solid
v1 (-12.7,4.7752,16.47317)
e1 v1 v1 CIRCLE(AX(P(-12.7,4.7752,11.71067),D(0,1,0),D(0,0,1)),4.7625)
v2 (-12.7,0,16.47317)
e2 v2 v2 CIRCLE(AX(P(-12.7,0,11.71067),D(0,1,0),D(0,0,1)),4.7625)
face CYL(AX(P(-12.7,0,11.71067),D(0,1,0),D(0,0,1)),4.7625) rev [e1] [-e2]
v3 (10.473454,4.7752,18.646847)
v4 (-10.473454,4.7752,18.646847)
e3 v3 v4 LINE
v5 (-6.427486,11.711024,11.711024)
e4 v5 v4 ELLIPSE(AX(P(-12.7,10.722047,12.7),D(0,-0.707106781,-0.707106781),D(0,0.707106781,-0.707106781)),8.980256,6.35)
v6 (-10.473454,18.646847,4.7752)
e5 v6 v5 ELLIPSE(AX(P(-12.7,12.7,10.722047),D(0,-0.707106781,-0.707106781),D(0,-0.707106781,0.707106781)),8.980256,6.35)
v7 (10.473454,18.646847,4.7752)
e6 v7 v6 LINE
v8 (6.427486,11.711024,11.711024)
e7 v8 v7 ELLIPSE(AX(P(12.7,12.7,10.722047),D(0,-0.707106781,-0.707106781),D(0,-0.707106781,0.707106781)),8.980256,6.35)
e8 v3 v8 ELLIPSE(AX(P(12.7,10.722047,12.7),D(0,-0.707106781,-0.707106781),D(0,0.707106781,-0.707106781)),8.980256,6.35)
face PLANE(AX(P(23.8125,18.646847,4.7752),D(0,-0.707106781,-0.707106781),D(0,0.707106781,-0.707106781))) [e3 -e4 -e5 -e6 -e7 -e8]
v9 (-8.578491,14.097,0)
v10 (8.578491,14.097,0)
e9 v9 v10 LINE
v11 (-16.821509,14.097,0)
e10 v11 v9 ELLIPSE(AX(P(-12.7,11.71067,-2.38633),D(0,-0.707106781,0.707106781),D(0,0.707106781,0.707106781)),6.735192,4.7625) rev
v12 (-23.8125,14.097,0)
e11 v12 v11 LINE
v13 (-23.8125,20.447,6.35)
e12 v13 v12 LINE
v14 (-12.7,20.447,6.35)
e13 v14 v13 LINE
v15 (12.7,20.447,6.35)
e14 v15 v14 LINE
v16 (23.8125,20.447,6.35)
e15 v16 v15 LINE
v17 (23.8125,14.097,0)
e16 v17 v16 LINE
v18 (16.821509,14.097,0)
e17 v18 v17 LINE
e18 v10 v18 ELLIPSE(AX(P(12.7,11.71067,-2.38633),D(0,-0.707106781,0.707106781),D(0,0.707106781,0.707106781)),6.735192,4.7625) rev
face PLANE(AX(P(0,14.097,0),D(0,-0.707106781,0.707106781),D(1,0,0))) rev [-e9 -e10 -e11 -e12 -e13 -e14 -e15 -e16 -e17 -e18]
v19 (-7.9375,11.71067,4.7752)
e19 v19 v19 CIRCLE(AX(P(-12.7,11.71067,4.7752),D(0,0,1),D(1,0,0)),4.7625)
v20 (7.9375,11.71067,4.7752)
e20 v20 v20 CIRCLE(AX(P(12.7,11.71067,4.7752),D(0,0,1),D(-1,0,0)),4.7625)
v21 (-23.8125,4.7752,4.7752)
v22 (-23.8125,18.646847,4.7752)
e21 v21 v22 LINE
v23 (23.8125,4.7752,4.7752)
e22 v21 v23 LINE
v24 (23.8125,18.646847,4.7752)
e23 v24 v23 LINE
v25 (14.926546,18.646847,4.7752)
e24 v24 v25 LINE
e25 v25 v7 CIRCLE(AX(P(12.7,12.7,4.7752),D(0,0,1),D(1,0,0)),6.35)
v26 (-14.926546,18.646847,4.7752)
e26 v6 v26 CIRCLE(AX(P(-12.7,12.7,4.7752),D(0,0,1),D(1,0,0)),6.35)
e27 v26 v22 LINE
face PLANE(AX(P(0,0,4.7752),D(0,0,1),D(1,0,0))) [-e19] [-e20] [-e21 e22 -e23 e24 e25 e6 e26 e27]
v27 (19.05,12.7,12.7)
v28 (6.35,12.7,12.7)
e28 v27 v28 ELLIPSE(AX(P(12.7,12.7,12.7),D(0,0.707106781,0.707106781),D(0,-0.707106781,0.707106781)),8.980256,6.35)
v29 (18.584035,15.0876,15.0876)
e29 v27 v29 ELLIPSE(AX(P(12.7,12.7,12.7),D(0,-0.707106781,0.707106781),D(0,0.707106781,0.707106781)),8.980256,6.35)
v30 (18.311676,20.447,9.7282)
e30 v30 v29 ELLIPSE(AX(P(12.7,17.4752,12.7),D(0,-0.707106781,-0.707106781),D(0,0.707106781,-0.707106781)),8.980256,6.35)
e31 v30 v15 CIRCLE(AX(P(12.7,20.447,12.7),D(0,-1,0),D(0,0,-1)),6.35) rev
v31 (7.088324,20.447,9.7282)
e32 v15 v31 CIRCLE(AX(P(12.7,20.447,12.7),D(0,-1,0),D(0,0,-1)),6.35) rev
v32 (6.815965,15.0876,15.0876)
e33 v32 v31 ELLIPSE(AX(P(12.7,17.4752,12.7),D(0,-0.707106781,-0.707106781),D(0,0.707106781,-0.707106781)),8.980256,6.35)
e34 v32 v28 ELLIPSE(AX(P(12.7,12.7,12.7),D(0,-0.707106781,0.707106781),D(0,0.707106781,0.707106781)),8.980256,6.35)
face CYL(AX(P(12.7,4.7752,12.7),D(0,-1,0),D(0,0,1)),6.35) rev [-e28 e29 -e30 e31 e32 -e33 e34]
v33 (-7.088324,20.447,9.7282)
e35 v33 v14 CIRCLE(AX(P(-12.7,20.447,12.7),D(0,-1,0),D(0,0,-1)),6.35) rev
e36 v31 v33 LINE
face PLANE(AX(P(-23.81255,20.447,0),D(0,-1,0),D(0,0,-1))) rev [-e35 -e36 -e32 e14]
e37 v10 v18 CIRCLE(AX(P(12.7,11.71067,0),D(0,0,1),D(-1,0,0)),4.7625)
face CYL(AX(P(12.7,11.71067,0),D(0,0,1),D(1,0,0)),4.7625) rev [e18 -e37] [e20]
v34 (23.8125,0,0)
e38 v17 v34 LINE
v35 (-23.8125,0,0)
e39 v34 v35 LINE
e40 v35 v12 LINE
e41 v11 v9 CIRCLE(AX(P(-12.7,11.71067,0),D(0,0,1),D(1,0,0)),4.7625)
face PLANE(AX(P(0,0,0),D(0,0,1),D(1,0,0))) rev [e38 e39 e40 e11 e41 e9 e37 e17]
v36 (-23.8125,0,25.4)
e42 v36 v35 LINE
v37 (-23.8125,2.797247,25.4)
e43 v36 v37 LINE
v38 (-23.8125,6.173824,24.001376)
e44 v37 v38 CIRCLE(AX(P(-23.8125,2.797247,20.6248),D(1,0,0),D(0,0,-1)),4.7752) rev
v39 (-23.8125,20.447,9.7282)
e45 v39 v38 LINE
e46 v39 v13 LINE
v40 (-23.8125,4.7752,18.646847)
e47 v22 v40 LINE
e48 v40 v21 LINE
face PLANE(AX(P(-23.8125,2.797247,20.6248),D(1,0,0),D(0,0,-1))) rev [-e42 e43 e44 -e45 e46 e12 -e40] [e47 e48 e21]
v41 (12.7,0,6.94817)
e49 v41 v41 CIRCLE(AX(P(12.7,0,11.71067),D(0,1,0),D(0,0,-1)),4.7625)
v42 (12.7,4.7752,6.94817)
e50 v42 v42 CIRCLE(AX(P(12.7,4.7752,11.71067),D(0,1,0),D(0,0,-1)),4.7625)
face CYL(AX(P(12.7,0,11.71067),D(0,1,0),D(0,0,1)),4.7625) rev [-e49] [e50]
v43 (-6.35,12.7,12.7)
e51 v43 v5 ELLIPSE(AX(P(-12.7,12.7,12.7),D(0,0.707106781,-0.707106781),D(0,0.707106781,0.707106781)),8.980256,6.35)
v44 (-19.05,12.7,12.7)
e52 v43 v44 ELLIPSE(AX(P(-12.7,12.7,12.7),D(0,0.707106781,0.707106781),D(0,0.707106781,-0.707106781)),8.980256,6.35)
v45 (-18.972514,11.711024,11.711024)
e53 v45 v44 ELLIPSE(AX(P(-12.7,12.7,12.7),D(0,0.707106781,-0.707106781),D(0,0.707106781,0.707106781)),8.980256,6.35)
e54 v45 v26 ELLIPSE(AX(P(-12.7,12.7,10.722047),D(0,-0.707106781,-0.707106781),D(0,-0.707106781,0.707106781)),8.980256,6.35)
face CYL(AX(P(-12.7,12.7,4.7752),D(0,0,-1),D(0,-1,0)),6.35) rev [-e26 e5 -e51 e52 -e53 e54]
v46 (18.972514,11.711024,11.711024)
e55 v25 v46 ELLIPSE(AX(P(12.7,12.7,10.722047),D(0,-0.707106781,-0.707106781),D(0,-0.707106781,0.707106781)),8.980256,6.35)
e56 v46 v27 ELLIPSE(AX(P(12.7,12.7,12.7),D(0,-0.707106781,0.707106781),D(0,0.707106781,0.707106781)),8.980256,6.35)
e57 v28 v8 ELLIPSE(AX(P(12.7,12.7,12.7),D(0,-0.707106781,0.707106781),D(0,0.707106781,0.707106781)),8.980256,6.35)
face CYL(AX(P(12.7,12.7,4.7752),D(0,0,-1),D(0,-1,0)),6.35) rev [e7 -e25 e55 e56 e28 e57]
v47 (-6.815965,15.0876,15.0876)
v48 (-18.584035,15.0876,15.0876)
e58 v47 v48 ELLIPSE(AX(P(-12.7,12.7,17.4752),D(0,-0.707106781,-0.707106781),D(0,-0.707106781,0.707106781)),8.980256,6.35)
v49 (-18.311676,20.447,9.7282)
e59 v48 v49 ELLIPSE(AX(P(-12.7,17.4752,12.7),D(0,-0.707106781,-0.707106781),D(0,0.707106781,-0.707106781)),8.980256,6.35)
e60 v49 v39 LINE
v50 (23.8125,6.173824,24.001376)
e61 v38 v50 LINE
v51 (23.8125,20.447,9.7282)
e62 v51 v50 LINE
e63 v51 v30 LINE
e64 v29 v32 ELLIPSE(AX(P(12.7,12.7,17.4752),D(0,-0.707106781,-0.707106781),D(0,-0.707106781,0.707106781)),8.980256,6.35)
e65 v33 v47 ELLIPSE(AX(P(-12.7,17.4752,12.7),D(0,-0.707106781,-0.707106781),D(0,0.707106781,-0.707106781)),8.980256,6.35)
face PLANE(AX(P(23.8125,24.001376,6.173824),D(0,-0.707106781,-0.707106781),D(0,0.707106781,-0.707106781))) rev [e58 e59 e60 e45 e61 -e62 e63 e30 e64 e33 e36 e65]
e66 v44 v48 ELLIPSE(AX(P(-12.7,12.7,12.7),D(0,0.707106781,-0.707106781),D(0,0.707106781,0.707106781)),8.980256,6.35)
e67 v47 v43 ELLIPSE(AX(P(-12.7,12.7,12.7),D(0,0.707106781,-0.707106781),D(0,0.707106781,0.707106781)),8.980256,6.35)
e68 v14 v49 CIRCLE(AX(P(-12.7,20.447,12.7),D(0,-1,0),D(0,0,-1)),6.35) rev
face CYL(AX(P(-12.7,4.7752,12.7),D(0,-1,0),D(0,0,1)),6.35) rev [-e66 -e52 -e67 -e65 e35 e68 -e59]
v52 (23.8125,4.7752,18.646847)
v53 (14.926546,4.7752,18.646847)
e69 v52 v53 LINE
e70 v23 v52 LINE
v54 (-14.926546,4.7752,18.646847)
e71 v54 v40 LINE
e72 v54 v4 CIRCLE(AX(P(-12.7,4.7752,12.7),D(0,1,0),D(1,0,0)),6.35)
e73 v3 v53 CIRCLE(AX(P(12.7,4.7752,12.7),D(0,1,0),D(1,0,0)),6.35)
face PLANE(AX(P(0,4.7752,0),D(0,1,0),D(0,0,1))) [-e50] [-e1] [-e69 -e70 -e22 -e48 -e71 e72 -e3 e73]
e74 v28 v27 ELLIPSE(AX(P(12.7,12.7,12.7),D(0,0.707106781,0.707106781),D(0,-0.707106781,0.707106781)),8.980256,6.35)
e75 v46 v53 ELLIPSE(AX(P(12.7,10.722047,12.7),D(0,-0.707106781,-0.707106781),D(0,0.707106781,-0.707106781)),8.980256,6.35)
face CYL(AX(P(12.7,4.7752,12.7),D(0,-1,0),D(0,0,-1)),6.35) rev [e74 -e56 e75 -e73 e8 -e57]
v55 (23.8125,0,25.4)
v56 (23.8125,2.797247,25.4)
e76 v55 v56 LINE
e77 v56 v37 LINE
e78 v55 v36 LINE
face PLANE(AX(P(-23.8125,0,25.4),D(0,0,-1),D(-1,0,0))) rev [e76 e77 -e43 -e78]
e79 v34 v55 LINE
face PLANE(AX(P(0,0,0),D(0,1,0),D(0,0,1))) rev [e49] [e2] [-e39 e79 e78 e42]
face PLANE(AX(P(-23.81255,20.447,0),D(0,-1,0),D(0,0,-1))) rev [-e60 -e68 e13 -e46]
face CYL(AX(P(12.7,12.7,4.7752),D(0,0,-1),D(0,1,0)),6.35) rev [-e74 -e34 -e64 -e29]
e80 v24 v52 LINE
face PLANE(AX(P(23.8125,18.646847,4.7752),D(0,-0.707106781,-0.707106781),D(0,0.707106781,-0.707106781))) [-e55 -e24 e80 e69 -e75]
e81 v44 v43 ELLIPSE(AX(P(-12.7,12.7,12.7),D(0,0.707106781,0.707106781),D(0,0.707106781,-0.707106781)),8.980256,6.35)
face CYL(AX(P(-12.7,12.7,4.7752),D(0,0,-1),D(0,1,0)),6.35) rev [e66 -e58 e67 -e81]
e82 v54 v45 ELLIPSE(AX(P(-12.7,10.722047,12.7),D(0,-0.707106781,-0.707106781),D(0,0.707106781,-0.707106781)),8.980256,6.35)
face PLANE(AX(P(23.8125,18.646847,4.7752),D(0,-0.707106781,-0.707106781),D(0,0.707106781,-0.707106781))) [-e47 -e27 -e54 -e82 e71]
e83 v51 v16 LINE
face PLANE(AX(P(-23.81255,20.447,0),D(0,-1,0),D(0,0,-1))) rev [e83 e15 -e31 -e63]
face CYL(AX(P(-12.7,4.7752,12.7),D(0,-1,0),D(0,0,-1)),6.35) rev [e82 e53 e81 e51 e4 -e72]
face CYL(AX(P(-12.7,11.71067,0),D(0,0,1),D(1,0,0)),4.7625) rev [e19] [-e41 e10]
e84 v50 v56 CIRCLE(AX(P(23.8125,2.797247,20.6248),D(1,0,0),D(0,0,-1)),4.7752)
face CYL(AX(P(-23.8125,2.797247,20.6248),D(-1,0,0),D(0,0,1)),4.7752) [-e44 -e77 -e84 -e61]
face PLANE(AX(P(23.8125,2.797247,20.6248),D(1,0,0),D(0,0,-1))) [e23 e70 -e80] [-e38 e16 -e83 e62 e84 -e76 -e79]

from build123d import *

# Parameters (mm, degrees)
BOSS_EXTRUDE1_START     = -20.6248
BOSS_EXTRUDE1_OUTLINE_W = 47.625
BOSS_EXTRUDE1_OUTLINE_H = 20.6248
BOSS_EXTRUDE1_DEPTH     = 25.4
BOSS_EXTRUDE1_2_DEPTH   = 4.7752
BOSS_EXTRUDE1_START_2   = 4.7752
BOSS_EXTRUDE1_3_DEPTH   = 20.6248
BOSS_EXTRUDE1_START_3   = -23.8125
BOSS_EXTRUDE1_4_DEPTH   = 47.625
SKETCH2_W               = 47.625
SKETCH2_H               = 25.4
BOSS_EXTRUDE2_DEPTH     = 4.7752
FILLET1_R               = 4.7752
CUT_EXTRUDE1_DEPTH      = 60.652834174
CHAMFER2_SIZE           = 6.35
SKETCH4_R               = 4.7625
CUT_EXTRUDE2_DEPTH      = 39.181153396
SKETCH5_R               = 4.7625
CUT_EXTRUDE3_DEPTH      = 38.556588562


with BuildPart() as part:
    # Boss-Extrude1: read off the stored shape, not the designer's step
    # Boss-Extrude1 outline → Boss-Extrude1 (new body)
    with BuildSketch(Plane.XZ.offset(-4.7752).offset(BOSS_EXTRUDE1_START)):
        with Locations((0, 15.0876)):
            Rectangle(BOSS_EXTRUDE1_OUTLINE_W, BOSS_EXTRUDE1_OUTLINE_H)
        with BuildLine():
            ThreePointArc((-18.972513521, 11.711023698), (-12.7, 19.05), (-6.427486479, 11.711023698))
            ThreePointArc((-6.427486479, 11.711023698), (-12.7, 6.35), (-18.972513521, 11.711023698))
        make_face(mode=Mode.SUBTRACT)
        with BuildLine():
            ThreePointArc((6.427486479, 11.711023698), (12.7, 19.05), (18.972513521, 11.711023698))
            ThreePointArc((18.972513521, 11.711023698), (12.7, 6.35), (6.427486479, 11.711023698))
        make_face(mode=Mode.SUBTRACT)
    extrude(amount=BOSS_EXTRUDE1_DEPTH)

    # Boss-Extrude1 2 outline → Boss-Extrude1 2 (add)
    with BuildSketch(Plane.XZ.offset(-4.7752)):
        with BuildLine():
            ThreePointArc((-18.972513521, 11.711023698), (-12.7, 6.35), (-6.427486479, 11.711023698))
            ThreePointArc((-6.427486479, 11.711023698), (-12.7, 19.05), (-18.972513521, 11.711023698))
        make_face()
        with BuildLine():
            ThreePointArc((6.427486479, 11.711023698), (12.7, 6.35), (18.972513521, 11.711023698))
            ThreePointArc((18.972513521, 11.711023698), (12.7, 19.05), (6.427486479, 11.711023698))
        make_face()
    extrude(amount=BOSS_EXTRUDE1_2_DEPTH)

    # Boss-Extrude1 3 outline → Boss-Extrude1 3 (cut)
    with BuildSketch(Plane.XY.offset(BOSS_EXTRUDE1_START_2)):
        with BuildLine():
            ThreePointArc((18.972513521, 11.711023698), (12.7, 19.05), (6.427486479, 11.711023698))
            ThreePointArc((6.427486479, 11.711023698), (12.7, 6.35), (18.972513521, 11.711023698))
        make_face()
        with BuildLine():
            ThreePointArc((-6.427486479, 11.711023698), (-12.7, 19.05), (-18.972513521, 11.711023698))
            ThreePointArc((-18.972513521, 11.711023698), (-12.7, 6.35), (-6.427486479, 11.711023698))
        make_face()
    extrude(amount=BOSS_EXTRUDE1_3_DEPTH, mode=Mode.SUBTRACT)

    # Boss-Extrude1 4 outline → Boss-Extrude1 4 (cut)
    with BuildSketch(Plane.YZ.offset(BOSS_EXTRUDE1_START_3)):
        Polygon((25.4, 25.4), (4.7752, 25.4), (25.4, 4.7752), align=None)
        Polygon((4.7752, 4.7752), (18.646847397, 4.7752), (4.7752, 18.646847397), align=None)
    extrude(amount=BOSS_EXTRUDE1_4_DEPTH, mode=Mode.SUBTRACT)

    # Sketch2 → Boss-Extrude2 (add)
    with BuildSketch(Plane(origin=(0, 0, 4.7752), x_dir=(-1, 0, 0), z_dir=(0, 0, -1))):
        with Locations((0, 12.7)):
            Rectangle(SKETCH2_W, SKETCH2_H)
    extrude(amount=BOSS_EXTRUDE2_DEPTH)

    # Fillet1
    fillet1_edges = [part.edges().sort_by_distance(p)[0] for p in [
        (0, 25.4, 4.7752),
        (0, 4.7752, 25.4),
    ]]
    fillet(fillet1_edges, radius=FILLET1_R)

    # Sketch3 → Cut-Extrude1 (cut, through all)
    with BuildSketch(Plane(origin=(23.8125, 0, 0), x_dir=(0, 0, -1), z_dir=(1, 0, 0))):
        Polygon((0, 20.447), (-11.476191114, 20.447), (-2.66042984, 31.108635465), (0, 31.108635465), align=None)
    extrude(amount=-CUT_EXTRUDE1_DEPTH, mode=Mode.SUBTRACT)

    # Chamfer2
    chamfer2_edges = [part.edges().sort_by_distance(p)[0] for p in [
        (0, 20.447, 0),
    ]]
    chamfer(chamfer2_edges, length=CHAMFER2_SIZE - 0.0001)  # a hair under: the kernel refuses the full size

    # Sketch4 → Cut-Extrude2 (cut, through all)
    with BuildSketch(Plane(origin=(0, 4.7752, 0), x_dir=(1, 0, 0), z_dir=(0, 1, 0))):
        with Locations(Location((-12.7, -11.71067, 0), (0, 0, 270))):
            Circle(SKETCH4_R)
        with Locations(Location((12.7, -11.71067, 0), (0, 0, 90))):
            Circle(SKETCH4_R)
    extrude(amount=-CUT_EXTRUDE2_DEPTH, mode=Mode.SUBTRACT)

    # Sketch5 → Cut-Extrude3 (cut, through all)
    with BuildSketch(Plane.XY.offset(4.7752)):
        with Locations((-12.7, 11.71067)):
            Circle(SKETCH5_R)
        with Locations(Location((12.7, 11.71067, 0), (0, 0, 30.070595226))):
            Circle(SKETCH5_R)
    extrude(amount=-CUT_EXTRUDE3_DEPTH, mode=Mode.SUBTRACT)


solid = part.part
